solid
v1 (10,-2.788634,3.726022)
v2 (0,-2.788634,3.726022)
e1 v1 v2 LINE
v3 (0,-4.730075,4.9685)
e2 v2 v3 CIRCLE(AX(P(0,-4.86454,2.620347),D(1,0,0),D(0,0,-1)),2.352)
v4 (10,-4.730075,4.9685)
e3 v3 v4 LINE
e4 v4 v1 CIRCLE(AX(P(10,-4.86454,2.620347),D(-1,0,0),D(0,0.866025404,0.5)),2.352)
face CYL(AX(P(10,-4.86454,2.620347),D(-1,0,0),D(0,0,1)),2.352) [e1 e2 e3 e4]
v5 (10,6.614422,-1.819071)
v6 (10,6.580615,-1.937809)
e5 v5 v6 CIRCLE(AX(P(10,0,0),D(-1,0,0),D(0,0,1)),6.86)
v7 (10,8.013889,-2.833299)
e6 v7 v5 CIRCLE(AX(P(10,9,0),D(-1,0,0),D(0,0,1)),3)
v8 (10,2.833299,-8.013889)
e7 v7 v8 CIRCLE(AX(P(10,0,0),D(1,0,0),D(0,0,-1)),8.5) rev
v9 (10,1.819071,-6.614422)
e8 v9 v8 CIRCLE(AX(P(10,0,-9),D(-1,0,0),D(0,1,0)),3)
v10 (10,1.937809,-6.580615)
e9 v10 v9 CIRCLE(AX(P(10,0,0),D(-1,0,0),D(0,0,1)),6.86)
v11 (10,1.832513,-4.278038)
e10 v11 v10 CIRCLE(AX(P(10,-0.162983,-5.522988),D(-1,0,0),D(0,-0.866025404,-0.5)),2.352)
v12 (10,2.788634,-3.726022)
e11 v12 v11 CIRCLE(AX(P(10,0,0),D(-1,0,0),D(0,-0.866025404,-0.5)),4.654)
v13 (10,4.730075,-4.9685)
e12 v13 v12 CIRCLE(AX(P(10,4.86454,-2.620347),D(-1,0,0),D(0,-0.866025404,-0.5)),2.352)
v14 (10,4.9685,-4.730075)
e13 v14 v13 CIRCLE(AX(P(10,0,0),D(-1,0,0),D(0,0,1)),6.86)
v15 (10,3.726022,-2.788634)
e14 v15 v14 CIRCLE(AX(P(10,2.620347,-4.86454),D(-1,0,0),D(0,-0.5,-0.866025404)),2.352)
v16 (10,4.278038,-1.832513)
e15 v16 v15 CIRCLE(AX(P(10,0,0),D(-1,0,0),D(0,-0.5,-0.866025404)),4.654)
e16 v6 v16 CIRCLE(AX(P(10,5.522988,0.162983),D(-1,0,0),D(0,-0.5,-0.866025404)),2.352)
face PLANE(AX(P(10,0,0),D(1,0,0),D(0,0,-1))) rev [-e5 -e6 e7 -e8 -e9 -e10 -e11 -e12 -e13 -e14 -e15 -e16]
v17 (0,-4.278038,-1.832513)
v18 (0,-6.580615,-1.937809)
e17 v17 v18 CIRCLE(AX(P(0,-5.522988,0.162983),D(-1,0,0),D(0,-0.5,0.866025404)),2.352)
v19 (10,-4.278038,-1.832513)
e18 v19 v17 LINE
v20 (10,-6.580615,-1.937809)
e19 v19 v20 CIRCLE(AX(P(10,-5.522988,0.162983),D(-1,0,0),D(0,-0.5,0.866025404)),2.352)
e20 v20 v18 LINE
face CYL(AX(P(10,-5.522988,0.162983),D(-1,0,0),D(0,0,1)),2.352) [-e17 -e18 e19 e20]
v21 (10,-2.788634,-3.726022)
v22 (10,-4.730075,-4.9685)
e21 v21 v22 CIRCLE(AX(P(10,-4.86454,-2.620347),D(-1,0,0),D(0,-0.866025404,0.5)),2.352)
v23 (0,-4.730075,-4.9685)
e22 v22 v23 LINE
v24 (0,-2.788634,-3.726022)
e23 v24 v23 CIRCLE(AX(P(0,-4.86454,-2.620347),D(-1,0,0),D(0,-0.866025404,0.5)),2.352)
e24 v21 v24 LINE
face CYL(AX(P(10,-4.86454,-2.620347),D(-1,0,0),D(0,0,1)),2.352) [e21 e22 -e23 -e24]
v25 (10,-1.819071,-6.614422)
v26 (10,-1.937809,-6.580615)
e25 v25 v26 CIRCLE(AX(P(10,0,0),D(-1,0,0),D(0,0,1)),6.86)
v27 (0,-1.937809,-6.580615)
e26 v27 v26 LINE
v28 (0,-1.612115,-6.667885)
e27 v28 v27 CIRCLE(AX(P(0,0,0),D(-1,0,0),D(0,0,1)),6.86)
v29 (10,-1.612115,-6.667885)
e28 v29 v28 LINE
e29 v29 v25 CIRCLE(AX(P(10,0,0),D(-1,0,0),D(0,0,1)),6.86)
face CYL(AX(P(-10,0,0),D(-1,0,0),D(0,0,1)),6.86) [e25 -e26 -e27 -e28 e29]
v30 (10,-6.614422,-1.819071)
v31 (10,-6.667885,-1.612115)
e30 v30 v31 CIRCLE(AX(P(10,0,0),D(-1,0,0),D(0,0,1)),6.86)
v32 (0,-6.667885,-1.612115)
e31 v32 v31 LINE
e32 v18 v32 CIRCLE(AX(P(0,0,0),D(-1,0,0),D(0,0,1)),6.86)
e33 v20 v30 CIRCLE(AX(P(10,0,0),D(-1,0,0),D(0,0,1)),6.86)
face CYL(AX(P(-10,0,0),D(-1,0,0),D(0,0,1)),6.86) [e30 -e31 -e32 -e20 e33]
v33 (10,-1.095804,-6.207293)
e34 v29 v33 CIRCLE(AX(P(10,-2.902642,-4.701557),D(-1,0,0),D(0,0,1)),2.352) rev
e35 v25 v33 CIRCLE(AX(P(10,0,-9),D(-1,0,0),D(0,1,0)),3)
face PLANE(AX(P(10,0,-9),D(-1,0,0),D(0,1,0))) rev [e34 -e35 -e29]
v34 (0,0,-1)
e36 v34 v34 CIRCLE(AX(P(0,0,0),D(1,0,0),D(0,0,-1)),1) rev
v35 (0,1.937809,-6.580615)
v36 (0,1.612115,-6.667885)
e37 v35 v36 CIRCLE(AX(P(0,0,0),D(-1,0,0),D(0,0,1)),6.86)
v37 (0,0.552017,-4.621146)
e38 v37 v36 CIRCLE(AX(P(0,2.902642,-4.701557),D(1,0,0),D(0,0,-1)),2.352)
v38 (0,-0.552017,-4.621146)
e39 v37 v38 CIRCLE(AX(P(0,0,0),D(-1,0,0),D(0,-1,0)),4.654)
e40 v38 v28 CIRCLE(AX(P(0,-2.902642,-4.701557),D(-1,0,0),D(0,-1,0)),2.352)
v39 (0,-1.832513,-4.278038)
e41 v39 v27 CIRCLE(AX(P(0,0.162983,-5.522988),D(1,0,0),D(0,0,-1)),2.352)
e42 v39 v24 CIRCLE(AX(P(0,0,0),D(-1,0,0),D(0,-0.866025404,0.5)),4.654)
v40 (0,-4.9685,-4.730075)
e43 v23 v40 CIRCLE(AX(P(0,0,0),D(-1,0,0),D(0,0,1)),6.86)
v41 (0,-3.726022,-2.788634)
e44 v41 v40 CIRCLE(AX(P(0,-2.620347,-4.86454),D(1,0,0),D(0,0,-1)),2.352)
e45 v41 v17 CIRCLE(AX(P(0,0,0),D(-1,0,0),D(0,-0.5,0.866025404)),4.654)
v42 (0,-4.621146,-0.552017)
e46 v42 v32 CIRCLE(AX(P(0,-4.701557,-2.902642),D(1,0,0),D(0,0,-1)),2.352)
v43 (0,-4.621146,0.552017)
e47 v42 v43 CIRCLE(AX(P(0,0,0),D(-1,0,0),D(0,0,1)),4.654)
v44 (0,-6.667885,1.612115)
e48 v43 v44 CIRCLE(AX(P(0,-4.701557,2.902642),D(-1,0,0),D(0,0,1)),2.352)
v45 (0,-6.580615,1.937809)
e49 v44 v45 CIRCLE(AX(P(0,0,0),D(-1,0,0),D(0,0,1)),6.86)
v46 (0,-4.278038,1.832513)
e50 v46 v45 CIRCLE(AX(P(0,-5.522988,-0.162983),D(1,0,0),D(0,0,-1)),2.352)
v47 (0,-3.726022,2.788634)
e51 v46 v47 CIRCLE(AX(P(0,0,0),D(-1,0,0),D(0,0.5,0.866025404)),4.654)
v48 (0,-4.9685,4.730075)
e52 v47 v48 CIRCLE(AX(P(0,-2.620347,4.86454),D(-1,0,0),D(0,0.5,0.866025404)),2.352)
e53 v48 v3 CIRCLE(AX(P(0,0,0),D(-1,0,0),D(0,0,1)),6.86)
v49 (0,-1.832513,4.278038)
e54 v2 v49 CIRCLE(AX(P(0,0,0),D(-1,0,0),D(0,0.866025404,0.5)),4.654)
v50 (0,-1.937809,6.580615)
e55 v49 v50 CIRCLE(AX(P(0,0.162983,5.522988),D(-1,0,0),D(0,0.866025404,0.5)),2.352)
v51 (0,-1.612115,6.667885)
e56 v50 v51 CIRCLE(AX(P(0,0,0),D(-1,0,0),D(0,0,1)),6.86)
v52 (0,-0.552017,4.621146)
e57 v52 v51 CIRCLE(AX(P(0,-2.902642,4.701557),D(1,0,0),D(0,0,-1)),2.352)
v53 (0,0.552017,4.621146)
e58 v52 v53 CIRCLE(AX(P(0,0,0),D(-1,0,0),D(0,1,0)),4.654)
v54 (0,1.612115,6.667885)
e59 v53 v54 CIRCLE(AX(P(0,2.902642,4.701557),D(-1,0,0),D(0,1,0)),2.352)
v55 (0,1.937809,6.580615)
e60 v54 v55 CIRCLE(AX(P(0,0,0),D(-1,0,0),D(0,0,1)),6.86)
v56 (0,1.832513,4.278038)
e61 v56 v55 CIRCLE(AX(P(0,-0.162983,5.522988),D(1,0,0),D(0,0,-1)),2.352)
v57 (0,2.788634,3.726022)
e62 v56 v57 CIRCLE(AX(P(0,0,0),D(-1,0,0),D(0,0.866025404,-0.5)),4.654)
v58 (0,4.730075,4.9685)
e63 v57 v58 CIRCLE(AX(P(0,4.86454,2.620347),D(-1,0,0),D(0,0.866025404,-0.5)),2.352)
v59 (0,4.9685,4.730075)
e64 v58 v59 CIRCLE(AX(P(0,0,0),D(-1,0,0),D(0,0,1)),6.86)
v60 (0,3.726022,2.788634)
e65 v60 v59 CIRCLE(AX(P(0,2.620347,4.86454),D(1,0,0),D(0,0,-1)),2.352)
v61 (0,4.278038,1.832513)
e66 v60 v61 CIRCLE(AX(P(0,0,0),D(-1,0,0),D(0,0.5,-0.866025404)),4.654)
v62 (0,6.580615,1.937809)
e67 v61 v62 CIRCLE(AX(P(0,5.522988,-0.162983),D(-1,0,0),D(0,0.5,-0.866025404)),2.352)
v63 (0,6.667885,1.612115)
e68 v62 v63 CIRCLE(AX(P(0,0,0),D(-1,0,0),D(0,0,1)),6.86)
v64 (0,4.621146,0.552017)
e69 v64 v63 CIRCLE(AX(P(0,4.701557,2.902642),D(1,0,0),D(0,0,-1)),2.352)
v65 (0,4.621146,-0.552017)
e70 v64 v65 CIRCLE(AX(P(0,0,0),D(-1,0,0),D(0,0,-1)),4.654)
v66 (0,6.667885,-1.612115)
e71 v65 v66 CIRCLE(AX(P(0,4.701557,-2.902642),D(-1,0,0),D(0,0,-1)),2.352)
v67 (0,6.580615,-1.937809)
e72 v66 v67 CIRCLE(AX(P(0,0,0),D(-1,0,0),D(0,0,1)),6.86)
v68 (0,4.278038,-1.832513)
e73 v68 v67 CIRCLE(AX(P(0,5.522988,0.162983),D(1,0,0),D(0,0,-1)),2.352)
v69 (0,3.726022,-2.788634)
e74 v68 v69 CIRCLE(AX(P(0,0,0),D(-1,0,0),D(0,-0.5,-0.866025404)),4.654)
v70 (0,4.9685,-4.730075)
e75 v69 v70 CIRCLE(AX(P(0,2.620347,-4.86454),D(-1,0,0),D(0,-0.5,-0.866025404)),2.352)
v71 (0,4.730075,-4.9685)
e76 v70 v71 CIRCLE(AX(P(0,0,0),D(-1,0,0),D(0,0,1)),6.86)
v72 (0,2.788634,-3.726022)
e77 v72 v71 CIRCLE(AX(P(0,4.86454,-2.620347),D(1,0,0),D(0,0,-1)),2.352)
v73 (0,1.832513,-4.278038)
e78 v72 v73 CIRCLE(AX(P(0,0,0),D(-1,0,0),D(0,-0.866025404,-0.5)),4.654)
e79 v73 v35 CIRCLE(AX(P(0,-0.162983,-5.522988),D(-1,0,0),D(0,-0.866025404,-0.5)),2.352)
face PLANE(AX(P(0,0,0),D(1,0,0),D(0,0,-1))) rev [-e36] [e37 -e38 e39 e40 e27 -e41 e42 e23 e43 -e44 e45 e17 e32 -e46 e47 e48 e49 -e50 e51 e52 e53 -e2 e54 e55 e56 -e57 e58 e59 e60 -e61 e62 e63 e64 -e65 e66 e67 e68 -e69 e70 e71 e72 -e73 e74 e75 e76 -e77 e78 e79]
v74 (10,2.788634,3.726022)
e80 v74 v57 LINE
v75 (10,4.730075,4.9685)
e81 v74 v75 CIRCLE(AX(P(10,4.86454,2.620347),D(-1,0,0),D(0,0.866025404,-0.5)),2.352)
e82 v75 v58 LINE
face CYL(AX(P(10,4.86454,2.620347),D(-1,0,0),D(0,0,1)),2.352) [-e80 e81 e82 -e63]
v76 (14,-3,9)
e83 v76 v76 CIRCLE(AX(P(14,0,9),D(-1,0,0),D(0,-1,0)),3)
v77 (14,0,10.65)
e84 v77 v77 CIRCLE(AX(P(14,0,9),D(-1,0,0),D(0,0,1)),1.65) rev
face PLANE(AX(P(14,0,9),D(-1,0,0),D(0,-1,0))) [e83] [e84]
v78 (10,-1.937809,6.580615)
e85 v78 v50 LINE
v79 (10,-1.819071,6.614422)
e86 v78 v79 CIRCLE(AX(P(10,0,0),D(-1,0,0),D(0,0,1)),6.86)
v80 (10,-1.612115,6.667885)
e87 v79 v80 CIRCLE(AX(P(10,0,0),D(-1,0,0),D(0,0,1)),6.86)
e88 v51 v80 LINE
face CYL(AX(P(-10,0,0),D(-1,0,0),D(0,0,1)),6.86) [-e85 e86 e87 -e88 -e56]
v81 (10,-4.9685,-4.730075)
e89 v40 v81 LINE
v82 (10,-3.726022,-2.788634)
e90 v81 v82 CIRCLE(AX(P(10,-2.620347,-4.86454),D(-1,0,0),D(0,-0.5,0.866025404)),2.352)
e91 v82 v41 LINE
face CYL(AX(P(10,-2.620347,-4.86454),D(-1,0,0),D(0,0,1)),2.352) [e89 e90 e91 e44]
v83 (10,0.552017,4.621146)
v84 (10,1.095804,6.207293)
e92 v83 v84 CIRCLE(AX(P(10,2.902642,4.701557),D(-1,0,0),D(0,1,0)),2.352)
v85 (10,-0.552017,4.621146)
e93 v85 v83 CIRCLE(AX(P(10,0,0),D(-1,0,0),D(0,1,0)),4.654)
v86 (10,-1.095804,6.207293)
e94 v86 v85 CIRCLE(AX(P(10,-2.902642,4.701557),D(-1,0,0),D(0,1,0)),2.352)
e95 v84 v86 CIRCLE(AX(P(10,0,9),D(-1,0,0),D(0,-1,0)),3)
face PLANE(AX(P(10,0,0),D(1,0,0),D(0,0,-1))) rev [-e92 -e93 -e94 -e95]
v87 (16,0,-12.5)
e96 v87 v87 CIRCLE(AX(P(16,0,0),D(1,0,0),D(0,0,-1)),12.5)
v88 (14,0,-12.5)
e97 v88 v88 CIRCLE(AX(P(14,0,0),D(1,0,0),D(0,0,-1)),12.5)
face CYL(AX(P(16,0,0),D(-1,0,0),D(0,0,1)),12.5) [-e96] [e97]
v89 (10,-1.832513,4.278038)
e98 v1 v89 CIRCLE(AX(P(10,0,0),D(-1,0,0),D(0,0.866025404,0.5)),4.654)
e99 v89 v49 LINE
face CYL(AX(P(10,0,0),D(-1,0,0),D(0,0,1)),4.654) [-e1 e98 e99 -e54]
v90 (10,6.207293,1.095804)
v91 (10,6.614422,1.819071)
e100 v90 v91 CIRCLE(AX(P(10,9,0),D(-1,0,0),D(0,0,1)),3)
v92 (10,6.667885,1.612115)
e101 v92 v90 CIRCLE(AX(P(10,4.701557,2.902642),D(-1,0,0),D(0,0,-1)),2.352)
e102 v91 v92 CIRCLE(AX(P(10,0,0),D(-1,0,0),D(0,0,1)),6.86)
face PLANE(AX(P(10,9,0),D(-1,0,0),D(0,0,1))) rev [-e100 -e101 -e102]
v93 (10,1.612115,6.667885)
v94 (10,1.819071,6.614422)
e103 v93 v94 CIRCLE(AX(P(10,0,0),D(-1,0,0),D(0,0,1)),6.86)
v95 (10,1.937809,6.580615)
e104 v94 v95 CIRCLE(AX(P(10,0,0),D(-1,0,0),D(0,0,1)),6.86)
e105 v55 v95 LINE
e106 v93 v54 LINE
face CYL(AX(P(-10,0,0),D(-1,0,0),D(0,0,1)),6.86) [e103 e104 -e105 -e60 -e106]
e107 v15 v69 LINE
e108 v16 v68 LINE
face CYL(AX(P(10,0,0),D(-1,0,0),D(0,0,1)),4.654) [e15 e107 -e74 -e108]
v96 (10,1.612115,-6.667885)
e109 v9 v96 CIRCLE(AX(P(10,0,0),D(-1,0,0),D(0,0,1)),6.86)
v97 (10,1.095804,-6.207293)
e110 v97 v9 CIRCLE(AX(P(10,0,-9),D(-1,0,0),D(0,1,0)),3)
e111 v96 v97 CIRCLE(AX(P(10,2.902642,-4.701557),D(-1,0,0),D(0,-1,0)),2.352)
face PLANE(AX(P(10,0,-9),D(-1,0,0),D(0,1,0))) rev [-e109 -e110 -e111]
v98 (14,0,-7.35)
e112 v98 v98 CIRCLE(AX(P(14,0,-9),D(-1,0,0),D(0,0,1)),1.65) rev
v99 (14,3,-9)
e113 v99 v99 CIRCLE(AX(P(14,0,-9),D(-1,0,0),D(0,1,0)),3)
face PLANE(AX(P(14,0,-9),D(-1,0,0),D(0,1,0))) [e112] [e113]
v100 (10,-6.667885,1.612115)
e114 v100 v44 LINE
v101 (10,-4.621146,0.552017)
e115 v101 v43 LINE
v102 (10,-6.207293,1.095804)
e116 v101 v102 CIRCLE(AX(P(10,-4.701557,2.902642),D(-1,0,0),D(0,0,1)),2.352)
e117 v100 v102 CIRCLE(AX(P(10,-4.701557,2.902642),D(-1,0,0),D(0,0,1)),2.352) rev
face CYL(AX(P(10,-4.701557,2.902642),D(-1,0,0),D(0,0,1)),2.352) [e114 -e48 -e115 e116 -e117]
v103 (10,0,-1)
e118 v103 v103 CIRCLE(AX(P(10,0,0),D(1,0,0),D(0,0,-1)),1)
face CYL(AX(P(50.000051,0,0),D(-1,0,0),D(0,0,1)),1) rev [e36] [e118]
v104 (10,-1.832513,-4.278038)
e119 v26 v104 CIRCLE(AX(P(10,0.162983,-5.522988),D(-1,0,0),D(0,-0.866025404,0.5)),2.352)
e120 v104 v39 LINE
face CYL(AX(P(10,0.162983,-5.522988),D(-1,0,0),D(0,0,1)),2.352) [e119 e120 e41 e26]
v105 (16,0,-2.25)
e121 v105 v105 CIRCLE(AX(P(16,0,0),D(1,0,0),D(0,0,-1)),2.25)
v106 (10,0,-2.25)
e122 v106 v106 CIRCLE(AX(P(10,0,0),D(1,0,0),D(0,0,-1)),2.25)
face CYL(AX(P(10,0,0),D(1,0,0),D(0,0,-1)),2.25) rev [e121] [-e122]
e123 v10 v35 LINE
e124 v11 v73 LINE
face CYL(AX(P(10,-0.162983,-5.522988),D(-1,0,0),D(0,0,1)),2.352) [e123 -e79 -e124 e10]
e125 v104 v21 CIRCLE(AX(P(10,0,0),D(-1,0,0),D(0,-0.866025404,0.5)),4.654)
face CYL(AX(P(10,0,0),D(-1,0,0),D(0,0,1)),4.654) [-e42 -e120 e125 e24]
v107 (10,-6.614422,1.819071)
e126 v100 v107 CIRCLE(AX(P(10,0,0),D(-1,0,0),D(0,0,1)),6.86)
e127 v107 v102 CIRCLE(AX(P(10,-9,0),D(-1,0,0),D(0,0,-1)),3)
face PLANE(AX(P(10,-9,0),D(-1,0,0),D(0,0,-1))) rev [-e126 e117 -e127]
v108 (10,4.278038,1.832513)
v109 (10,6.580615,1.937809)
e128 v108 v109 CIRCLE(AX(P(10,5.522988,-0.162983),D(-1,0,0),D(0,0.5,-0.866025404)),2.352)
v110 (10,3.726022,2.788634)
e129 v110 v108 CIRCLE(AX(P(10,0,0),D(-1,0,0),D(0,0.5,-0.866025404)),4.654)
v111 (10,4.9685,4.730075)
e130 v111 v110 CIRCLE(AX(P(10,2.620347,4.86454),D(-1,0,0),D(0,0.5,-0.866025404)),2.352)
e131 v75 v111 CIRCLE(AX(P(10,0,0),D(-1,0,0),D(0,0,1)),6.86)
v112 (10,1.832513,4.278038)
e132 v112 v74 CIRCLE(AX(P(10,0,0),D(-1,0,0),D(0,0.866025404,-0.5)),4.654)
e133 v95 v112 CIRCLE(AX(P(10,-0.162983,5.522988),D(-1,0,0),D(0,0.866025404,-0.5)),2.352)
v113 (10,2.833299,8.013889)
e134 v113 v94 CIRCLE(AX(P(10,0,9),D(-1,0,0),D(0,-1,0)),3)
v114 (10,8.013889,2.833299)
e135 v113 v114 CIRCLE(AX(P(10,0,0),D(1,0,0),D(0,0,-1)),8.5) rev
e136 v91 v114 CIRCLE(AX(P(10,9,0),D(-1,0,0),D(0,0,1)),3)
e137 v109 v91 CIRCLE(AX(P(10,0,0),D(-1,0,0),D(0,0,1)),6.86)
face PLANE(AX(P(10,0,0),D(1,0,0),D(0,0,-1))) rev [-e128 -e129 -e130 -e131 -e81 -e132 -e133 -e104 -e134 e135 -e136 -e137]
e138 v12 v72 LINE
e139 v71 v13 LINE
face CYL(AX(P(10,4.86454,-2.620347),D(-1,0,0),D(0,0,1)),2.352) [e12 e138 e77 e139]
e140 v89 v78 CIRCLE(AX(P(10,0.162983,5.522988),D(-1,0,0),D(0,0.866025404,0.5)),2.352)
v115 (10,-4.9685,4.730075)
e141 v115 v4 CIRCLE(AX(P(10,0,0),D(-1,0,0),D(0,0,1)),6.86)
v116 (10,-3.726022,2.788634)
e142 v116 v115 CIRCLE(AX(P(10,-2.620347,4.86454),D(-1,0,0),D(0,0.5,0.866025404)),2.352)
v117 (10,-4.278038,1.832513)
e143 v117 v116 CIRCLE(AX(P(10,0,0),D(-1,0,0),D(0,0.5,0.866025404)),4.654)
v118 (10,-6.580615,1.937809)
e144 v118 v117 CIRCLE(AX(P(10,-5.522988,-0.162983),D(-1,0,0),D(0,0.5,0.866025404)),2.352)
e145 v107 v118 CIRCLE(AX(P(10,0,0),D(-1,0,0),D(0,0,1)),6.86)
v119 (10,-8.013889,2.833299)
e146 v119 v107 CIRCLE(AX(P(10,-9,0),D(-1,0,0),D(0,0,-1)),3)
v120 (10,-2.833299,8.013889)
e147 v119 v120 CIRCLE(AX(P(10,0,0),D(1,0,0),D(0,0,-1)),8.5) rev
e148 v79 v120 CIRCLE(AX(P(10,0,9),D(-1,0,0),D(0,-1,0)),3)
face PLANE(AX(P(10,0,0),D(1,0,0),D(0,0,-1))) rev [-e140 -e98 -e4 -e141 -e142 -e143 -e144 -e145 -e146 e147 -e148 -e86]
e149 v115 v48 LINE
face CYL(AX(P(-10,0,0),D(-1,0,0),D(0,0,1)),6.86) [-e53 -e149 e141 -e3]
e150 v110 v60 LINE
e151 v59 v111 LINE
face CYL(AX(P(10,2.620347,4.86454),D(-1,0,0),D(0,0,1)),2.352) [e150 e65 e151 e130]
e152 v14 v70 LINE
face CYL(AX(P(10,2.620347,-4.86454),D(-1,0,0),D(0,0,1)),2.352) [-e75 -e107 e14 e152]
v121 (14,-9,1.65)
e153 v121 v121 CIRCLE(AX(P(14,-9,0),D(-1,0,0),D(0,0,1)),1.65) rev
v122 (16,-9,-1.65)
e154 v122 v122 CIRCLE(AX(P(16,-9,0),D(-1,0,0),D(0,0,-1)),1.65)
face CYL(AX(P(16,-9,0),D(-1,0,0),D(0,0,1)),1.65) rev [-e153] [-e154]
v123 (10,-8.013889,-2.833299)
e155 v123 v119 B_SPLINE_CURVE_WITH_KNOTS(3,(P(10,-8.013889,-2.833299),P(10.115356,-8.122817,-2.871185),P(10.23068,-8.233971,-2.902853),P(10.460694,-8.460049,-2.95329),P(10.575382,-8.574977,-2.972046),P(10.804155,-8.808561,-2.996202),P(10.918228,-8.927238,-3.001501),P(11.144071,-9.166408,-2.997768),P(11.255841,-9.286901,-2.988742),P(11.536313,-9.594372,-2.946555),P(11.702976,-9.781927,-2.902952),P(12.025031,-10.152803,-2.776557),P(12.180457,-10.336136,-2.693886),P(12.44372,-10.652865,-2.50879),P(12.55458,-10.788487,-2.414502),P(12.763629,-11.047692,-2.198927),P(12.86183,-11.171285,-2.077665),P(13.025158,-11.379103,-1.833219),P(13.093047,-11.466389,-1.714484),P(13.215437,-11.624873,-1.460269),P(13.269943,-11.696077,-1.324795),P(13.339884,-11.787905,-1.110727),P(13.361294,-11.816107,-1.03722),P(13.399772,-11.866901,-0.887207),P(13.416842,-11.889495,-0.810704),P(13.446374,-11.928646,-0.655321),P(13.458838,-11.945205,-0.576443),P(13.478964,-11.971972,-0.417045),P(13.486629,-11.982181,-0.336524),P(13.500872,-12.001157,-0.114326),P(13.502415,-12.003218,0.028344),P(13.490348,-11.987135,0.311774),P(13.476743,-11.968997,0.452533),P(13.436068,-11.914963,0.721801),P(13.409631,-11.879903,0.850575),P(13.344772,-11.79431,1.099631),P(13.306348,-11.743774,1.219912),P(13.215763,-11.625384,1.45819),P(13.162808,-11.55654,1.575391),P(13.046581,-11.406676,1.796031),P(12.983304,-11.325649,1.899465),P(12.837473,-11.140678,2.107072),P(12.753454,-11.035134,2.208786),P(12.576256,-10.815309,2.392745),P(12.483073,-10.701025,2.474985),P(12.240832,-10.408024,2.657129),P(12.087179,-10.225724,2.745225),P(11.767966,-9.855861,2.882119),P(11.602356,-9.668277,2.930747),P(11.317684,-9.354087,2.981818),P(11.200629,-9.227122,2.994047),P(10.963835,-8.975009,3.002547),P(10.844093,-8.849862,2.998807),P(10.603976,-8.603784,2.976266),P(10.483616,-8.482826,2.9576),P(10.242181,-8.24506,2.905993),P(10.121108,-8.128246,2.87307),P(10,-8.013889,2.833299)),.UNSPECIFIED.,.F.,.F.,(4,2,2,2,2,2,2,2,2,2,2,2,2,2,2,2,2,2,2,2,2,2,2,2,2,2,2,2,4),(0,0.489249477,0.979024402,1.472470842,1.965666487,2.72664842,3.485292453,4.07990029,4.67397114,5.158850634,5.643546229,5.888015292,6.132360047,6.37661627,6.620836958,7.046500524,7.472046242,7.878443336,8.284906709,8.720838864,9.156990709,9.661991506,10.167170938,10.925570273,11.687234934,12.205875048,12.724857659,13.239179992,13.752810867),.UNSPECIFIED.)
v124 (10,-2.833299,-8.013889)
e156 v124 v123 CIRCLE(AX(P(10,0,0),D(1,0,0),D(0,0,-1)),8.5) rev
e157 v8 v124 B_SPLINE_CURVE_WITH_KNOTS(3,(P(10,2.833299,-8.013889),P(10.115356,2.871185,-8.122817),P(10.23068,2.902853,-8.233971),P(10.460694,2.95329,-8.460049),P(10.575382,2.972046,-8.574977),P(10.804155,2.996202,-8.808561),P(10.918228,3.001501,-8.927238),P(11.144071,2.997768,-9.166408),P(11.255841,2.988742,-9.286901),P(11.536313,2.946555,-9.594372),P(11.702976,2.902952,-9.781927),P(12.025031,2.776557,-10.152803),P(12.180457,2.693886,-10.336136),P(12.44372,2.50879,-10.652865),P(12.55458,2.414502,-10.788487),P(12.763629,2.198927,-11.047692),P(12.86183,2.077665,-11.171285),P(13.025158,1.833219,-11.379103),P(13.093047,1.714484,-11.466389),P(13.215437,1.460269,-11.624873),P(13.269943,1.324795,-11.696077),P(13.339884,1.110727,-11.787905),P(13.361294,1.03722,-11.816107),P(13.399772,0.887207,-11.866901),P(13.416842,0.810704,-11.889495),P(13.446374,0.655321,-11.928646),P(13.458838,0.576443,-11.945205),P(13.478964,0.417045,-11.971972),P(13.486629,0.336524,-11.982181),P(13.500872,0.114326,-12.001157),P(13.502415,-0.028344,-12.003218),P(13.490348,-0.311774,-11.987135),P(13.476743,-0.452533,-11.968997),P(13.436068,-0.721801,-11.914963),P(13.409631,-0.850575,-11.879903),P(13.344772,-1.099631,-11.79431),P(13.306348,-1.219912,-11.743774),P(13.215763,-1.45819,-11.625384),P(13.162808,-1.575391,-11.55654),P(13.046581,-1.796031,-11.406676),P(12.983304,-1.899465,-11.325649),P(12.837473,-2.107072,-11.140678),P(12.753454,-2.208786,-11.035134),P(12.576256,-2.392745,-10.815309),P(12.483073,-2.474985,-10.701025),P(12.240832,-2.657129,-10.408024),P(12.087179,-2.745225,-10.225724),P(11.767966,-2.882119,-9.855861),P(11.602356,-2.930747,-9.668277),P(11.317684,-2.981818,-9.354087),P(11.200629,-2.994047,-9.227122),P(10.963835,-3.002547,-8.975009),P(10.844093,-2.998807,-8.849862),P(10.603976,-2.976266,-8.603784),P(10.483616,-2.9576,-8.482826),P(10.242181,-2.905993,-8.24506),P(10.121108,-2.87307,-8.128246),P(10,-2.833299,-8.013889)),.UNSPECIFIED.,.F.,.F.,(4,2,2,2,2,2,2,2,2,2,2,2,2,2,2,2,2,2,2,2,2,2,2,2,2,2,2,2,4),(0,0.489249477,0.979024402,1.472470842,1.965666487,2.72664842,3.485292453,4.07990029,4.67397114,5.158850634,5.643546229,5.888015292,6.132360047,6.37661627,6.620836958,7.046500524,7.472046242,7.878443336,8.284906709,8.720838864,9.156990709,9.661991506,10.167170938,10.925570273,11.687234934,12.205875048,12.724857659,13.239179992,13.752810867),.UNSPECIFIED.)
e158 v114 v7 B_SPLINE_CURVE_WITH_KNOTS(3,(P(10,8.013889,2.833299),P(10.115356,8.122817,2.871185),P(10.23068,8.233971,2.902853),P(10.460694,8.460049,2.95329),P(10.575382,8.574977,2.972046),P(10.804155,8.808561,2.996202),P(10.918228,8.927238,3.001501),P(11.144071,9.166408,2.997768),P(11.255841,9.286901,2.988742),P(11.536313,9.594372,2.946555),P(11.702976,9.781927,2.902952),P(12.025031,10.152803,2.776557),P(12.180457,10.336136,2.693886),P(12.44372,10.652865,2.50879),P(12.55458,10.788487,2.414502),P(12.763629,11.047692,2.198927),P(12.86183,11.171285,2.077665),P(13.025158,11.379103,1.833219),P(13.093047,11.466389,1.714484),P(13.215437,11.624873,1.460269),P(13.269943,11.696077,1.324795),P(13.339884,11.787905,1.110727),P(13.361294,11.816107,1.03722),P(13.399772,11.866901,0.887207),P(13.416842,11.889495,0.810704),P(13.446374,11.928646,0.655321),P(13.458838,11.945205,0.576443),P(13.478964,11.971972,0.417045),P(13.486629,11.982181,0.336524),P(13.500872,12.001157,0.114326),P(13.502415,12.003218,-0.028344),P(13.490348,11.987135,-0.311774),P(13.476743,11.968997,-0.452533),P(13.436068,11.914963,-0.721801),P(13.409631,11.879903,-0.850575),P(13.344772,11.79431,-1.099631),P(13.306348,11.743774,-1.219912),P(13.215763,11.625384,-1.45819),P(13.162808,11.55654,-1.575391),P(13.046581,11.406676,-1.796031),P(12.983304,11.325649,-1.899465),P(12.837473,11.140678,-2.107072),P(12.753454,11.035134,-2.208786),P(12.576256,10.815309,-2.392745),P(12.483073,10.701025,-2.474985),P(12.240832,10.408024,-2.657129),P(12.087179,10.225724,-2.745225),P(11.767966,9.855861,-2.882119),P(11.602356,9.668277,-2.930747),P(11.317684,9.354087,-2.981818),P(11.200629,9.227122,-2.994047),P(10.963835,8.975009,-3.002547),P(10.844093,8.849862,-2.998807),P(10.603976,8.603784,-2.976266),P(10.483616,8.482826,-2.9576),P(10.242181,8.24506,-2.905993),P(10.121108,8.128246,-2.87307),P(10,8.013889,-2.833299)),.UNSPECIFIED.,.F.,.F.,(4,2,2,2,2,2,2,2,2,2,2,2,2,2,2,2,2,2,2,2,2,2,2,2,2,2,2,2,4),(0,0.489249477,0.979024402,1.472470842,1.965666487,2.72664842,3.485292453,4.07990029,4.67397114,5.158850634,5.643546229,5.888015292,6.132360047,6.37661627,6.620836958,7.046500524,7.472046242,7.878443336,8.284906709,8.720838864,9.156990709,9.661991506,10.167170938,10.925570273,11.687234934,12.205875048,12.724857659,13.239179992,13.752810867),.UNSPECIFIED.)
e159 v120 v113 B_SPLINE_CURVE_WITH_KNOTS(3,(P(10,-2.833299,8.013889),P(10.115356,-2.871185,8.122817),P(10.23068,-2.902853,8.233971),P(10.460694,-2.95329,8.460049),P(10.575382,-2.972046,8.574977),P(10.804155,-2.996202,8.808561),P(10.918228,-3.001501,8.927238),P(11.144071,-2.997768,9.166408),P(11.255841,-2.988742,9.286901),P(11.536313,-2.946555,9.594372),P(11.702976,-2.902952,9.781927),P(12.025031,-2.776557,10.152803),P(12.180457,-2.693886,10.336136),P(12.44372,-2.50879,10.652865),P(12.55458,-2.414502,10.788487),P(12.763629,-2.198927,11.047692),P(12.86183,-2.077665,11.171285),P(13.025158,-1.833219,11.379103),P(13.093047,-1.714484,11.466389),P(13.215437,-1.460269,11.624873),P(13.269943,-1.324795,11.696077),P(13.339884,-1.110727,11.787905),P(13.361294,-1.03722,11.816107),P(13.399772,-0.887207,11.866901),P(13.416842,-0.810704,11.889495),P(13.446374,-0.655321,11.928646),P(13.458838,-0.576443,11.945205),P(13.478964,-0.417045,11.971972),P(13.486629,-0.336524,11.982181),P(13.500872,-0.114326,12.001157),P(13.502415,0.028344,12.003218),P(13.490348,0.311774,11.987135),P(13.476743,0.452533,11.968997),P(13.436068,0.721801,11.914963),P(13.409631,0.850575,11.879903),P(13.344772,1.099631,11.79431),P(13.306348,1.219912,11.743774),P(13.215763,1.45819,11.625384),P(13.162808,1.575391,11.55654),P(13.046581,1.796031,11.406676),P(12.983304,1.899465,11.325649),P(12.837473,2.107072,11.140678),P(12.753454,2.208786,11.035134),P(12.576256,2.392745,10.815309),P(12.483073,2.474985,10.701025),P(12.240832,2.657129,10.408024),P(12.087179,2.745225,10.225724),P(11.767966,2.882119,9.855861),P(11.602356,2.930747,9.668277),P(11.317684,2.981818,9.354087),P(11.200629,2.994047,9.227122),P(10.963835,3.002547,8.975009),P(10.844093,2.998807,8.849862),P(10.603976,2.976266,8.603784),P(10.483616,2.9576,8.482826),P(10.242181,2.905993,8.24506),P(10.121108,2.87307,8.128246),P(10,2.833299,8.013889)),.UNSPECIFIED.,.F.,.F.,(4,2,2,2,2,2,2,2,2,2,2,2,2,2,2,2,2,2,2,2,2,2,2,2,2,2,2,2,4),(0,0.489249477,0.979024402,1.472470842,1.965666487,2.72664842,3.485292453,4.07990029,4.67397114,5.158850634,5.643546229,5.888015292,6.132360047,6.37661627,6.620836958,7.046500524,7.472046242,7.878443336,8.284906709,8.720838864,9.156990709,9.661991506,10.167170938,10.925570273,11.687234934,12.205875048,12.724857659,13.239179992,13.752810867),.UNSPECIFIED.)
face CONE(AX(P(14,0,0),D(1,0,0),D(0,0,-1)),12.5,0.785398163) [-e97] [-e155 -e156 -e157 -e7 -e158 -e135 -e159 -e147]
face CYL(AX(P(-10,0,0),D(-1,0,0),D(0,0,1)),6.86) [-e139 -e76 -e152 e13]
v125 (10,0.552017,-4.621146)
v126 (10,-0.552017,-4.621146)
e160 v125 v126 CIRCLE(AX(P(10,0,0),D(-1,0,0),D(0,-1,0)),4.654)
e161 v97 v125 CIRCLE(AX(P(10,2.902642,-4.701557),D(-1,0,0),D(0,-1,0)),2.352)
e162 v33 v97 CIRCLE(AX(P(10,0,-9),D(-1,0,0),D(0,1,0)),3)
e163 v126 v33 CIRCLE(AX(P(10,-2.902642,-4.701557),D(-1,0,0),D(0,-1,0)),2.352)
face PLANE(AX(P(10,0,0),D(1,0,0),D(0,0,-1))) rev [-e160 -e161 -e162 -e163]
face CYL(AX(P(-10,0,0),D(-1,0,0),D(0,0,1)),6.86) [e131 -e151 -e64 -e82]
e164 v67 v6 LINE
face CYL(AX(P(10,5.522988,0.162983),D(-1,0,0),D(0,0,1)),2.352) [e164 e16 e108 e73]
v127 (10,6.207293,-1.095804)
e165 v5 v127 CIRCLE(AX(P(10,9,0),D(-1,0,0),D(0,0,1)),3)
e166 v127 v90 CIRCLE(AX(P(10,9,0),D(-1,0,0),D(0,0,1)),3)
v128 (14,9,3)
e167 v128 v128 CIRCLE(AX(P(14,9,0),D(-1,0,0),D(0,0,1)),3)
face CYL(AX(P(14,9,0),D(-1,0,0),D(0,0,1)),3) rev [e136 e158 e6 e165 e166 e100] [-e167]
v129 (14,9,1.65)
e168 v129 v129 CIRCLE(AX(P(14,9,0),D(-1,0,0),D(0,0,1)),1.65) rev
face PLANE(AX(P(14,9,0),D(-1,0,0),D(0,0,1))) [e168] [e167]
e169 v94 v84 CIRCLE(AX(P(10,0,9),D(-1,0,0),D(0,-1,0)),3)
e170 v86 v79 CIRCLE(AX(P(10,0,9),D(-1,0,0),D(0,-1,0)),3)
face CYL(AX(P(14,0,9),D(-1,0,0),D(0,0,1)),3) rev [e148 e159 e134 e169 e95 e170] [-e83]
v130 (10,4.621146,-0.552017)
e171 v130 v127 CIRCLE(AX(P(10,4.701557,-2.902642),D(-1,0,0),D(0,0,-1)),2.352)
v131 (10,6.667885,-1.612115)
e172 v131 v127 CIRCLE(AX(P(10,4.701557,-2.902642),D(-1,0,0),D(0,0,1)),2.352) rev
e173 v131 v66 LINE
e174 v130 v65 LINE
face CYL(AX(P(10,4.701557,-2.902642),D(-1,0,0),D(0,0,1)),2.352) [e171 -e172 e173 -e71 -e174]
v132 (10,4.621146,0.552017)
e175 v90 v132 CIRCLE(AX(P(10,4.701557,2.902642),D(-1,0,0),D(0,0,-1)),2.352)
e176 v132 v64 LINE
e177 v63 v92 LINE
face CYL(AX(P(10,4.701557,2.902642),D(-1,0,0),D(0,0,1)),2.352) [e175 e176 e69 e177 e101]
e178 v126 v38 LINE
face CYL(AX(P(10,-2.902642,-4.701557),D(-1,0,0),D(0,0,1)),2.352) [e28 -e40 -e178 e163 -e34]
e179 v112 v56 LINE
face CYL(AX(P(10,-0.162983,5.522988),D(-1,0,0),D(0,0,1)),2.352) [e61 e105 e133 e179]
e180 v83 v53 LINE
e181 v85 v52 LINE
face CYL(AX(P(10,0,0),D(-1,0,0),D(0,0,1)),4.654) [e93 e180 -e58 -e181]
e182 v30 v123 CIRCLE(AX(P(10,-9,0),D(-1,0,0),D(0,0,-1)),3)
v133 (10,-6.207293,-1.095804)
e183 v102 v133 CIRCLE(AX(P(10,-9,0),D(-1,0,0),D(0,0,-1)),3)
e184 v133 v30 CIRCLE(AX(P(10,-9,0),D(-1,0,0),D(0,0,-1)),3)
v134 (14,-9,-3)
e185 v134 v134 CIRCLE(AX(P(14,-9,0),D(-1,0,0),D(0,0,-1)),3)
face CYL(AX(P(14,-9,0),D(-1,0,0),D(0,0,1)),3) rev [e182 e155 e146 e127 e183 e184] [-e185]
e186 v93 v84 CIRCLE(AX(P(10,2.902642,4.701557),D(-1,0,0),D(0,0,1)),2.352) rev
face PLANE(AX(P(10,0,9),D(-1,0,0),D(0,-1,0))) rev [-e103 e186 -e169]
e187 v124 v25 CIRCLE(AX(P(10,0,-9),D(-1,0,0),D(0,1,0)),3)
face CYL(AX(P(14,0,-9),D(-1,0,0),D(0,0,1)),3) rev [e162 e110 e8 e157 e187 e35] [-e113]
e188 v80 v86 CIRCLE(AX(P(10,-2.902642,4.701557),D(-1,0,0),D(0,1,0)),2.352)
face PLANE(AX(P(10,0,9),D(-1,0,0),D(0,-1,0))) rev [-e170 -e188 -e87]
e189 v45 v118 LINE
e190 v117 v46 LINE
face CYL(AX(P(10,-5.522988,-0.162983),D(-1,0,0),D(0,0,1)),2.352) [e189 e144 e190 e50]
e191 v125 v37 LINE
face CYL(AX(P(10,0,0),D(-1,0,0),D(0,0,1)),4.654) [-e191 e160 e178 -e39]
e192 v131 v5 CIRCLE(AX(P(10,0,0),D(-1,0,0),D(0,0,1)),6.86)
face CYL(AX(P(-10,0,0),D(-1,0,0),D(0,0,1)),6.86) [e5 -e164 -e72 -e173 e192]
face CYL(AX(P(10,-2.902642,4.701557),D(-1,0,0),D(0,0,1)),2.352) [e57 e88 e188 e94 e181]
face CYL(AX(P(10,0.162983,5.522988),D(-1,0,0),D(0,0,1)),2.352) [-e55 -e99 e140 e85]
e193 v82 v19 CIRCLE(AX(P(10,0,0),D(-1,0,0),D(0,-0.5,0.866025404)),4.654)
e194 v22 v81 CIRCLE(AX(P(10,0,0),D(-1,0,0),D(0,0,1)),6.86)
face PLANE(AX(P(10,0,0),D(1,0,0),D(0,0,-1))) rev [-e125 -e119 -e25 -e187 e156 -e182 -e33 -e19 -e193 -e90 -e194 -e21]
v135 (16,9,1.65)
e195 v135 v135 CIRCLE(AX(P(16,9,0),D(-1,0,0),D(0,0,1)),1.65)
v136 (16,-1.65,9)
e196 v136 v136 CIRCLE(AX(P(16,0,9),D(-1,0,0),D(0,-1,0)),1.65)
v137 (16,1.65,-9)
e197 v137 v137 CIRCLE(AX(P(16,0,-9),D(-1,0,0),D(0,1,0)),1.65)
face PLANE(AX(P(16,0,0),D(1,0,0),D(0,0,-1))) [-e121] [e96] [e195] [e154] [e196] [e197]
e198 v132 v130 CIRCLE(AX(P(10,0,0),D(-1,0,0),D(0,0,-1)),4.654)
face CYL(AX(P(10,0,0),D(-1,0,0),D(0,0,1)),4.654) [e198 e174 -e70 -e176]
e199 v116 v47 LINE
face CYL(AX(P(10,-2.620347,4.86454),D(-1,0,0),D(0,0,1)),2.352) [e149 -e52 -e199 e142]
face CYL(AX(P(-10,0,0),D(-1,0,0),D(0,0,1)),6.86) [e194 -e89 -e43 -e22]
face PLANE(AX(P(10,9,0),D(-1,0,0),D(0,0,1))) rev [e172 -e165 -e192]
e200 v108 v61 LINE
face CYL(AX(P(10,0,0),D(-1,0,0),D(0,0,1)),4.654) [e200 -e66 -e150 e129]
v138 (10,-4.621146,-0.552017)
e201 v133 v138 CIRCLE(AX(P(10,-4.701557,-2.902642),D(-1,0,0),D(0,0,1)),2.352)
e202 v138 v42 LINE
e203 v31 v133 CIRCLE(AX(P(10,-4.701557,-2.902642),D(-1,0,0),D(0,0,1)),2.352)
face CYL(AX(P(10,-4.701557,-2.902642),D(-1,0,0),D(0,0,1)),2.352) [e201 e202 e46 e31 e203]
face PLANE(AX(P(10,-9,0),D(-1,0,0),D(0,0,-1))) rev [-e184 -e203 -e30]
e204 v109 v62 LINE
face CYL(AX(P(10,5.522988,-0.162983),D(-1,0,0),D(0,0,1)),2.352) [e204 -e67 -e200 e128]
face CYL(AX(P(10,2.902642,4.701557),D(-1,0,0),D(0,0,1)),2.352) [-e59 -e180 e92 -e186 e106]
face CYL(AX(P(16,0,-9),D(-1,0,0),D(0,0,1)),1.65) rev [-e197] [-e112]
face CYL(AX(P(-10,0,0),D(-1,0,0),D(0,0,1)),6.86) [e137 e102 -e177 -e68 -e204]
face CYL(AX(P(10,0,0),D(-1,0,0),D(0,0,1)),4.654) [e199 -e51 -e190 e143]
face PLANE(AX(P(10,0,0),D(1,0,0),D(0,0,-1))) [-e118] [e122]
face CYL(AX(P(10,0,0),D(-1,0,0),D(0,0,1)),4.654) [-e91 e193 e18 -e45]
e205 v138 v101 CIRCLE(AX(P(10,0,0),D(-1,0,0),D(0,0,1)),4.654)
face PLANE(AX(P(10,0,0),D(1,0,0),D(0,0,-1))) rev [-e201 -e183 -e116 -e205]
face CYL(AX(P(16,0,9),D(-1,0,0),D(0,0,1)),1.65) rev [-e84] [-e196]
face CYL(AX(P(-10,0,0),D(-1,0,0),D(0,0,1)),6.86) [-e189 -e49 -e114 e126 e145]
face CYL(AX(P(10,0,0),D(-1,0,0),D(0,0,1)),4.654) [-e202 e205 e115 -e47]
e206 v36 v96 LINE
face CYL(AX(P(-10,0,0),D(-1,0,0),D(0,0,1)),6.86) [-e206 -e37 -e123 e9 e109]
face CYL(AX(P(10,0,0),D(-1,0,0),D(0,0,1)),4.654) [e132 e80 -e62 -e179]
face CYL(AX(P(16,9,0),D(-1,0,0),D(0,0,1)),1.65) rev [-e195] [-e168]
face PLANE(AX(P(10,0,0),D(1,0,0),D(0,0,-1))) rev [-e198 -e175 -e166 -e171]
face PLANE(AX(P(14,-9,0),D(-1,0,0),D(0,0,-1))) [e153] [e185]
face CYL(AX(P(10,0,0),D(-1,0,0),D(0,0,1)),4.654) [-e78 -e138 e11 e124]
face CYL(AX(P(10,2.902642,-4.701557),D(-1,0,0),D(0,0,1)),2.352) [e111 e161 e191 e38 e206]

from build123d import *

# Parameters (mm, degrees)
BASPROSKE_W         = 10
BASPROSKE_H         = 6.86
TOOTHCUT_DEPTH      = 14.932666651
TEETHCUTS_COUNT     = 12
TEETHCUTS_ANGLE     = 330
BORSKE_R            = 1
BORE_DEPTH          = 50.0000508
SKETCH1_R           = 12.5
BOSS_EXTRUDE1_DEPTH = 6
SKETCH2_R           = 1.65
CUT_EXTRUDE1_DEPTH  = 21.310096012
SKETCH3_R           = 3
CUT_EXTRUDE2_DEPTH  = 4
CIRPATTERN1_COUNT   = 4
CHAMFER1_SIZE       = 4
SKETCH4_R           = 2.25
CUT_EXTRUDE3_DEPTH  = 6


with BuildPart() as part:
    # BasProSke → Base-Revolve (revolve)
    with BuildSketch(Plane(origin=(0, 0, 0), x_dir=(1, 0, 0), z_dir=(0, 1, 0)), mode=Mode.PRIVATE) as base_revolve_sk:
        with Locations((5, 3.43)):
            Rectangle(BASPROSKE_W, BASPROSKE_H)
    revolve(base_revolve_sk.sketch.rotate(Axis((-10, 0, 0), (1, 0, 0)), 180), axis=Axis((-10, 0, 0), (1, 0, 0)))

    # TooCutSke → ToothCut (cut, through all)
    with BuildSketch(Plane(origin=(0, 0, 0), x_dir=(0, 0, -1), z_dir=(1, 0, 0))):
        with BuildLine():
            ThreePointArc((0.552016647, 4.621146354), (0, 4.654), (-0.552016647, 4.621146354))
            ThreePointArc((-0.552016647, 4.621146354), (-0.822258441, 5.798784691), (-1.641510828, 6.686865885))
            ThreePointArc((-1.641510828, 6.686865885), (0, 6.8854), (1.641510828, 6.686865885))
            ThreePointArc((1.641510828, 6.686865885), (0.822258441, 5.798784691), (0.552016647, 4.621146354))
        make_face()
    toothcut = extrude(amount=TOOTHCUT_DEPTH, mode=Mode.SUBTRACT)

    # TeethCuts: ToothCut ×12 about axis
    teethcuts_axis = Axis((-10, 0, 0), (1, 0, 0))
    for i in range(1, TEETHCUTS_COUNT):
        add(toothcut.rotate(teethcuts_axis, i * TEETHCUTS_ANGLE / (TEETHCUTS_COUNT - 1)), mode=Mode.SUBTRACT)

    # BorSke → Bore (cut, symmetric)
    with BuildSketch(Plane(origin=(0, 0, 0), x_dir=(0, 0, -1), z_dir=(1, 0, 0))):
        with Locations(Location((0, 0, 0), (0, 0, 180))):
            Circle(BORSKE_R)
    extrude(amount=BORE_DEPTH, both=True, mode=Mode.SUBTRACT)

    # Sketch1 → Boss-Extrude1 (add)
    with BuildSketch(Plane(origin=(10, 0, 0), x_dir=(0, 0, -1), z_dir=(1, 0, 0))):
        Circle(SKETCH1_R)
    extrude(amount=BOSS_EXTRUDE1_DEPTH)

    # Sketch2 → Cut-Extrude1 (cut, through all)
    with BuildSketch(Plane.ZY.offset(-10)):
        with Locations((0, 9)):
            Circle(SKETCH2_R)
    cut_extrude1 = extrude(amount=-CUT_EXTRUDE1_DEPTH, mode=Mode.SUBTRACT)

    # Sketch3 → Cut-Extrude2 (cut)
    with BuildSketch(Plane.ZY.offset(-10)):
        with Locations((0, 9)):
            Circle(SKETCH3_R)
    cut_extrude2 = extrude(amount=-CUT_EXTRUDE2_DEPTH, mode=Mode.SUBTRACT)

    # CirPattern1: Cut-Extrude1, Cut-Extrude2 ×4 about axis
    cirpattern1_axis = Axis((0, 0, 0), (1, 0, 0))
    add([cut_extrude1.rotate(cirpattern1_axis, i * 360 / CIRPATTERN1_COUNT) for i in range(1, CIRPATTERN1_COUNT)], mode=Mode.SUBTRACT)
    add([cut_extrude2.rotate(cirpattern1_axis, i * 360 / CIRPATTERN1_COUNT) for i in range(1, CIRPATTERN1_COUNT)], mode=Mode.SUBTRACT)

    # Chamfer1
    # the kernel refuses this chamfer: 4 mm, written as the material it takes off along each edge
    with BuildSketch(Plane(origin=(10, 0, 0), x_dir=(0, 0, -1), z_dir=(0, -1, 0))) as chamfer1_piece_1:
        Polygon((12.5, CHAMFER1_SIZE), (12.5 - CHAMFER1_SIZE, 0), (12.5, 0), align=None)
    revolve(axis=Axis((10, 0, 0), (1, 0, 0)), mode=Mode.SUBTRACT)

    # Sketch4 → Cut-Extrude3 (cut)
    with BuildSketch(Plane(origin=(16, 0, 0), x_dir=(0, 0, -1), z_dir=(1, 0, 0))):
        Circle(SKETCH4_R)
    extrude(amount=-CUT_EXTRUDE3_DEPTH, mode=Mode.SUBTRACT)


solid = part.part
